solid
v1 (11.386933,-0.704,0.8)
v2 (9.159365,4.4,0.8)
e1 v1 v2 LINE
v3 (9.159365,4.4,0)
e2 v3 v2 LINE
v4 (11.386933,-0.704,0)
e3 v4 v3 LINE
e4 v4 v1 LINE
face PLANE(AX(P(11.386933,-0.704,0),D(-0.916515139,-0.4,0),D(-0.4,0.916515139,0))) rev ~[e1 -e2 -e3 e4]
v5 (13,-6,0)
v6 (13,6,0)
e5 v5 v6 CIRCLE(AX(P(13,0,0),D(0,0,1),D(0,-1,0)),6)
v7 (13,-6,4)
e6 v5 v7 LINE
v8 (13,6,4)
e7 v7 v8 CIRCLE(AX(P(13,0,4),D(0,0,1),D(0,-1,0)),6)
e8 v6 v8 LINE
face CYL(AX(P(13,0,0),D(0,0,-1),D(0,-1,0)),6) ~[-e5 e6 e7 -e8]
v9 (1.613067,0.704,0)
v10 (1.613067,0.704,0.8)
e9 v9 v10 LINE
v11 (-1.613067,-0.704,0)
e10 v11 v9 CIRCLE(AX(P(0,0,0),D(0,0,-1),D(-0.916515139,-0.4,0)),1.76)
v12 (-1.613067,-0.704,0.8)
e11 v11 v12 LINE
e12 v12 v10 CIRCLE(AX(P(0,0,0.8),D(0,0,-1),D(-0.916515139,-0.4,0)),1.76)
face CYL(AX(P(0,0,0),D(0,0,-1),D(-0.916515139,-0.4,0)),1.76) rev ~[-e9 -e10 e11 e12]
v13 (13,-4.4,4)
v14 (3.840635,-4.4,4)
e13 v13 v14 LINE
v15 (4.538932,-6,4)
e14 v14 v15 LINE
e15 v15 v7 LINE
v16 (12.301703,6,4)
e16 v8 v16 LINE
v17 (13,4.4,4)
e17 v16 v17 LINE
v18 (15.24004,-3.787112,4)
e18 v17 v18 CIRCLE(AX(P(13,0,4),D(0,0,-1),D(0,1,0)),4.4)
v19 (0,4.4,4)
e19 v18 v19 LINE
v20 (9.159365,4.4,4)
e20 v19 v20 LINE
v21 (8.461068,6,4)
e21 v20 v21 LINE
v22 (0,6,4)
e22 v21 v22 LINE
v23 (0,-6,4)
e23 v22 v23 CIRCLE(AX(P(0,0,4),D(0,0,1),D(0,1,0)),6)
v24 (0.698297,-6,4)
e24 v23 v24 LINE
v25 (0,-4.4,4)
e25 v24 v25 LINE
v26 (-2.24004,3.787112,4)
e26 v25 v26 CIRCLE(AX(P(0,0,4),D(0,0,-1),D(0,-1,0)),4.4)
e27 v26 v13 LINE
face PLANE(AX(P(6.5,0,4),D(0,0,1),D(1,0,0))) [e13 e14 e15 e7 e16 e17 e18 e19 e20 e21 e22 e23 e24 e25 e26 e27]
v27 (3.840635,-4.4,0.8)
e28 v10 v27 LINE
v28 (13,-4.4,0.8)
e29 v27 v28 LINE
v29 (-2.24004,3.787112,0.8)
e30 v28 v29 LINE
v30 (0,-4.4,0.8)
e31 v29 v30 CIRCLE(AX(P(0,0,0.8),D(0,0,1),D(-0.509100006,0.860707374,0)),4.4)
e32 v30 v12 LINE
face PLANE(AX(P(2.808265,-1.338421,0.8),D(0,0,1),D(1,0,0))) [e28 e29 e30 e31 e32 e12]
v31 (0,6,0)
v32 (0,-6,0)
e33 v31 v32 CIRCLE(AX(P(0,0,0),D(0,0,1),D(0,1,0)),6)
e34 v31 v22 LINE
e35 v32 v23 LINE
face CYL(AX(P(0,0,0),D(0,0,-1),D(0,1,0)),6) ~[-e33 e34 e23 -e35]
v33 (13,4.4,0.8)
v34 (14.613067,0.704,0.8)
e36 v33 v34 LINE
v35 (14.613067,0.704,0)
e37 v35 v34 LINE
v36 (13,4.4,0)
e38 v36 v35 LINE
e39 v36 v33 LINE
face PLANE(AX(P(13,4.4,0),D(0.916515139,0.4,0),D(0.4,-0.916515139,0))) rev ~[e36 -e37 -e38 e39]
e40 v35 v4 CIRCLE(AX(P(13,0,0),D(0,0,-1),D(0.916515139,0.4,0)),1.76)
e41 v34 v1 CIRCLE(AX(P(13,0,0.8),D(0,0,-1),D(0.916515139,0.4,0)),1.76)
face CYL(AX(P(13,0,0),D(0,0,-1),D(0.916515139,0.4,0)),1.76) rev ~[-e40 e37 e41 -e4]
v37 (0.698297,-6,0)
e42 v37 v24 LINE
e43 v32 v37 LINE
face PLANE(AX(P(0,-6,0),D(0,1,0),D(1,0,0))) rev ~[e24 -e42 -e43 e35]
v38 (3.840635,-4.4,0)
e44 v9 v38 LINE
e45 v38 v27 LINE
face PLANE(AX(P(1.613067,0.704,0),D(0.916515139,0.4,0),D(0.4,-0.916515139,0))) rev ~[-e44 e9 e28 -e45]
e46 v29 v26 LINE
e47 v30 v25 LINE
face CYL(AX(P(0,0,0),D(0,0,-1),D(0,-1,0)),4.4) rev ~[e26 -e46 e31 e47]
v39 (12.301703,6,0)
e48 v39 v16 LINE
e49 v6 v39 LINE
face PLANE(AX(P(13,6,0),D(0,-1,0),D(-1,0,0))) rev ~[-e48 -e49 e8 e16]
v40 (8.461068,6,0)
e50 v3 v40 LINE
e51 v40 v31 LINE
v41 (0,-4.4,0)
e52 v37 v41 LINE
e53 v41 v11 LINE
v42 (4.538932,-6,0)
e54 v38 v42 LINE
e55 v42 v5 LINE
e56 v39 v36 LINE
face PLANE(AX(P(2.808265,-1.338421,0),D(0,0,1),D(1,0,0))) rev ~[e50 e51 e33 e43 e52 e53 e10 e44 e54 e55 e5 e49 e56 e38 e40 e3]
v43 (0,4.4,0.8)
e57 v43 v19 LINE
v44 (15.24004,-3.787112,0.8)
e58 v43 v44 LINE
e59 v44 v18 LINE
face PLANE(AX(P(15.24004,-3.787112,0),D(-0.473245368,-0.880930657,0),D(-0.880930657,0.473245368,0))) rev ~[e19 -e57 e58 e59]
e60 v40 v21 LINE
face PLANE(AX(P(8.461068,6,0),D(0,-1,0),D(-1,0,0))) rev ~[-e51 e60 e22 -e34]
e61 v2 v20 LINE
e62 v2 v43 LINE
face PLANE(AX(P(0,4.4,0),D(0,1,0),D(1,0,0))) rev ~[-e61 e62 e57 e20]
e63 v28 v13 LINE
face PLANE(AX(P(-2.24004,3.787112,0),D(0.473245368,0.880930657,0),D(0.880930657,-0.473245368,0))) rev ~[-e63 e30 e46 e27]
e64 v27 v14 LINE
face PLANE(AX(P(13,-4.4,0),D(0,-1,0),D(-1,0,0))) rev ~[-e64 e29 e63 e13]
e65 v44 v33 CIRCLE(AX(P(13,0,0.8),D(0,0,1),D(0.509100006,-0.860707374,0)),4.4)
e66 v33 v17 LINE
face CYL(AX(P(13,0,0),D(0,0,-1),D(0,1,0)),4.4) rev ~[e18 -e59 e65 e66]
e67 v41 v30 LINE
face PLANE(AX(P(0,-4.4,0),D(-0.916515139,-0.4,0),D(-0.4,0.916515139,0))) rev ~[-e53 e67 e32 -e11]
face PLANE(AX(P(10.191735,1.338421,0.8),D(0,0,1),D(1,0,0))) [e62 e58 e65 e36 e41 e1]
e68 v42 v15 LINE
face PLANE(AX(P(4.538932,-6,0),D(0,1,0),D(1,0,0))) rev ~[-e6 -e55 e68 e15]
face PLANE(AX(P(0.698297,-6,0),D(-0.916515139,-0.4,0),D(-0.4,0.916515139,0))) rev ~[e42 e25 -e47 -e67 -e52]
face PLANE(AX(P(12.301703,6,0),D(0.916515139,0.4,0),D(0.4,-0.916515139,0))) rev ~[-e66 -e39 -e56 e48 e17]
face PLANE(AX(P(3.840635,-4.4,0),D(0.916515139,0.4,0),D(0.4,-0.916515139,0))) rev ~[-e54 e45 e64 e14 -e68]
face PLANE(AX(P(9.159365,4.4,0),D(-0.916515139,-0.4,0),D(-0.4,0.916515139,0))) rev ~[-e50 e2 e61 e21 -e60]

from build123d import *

# Parameters (mm, degrees)
F1_DEPTH = 4
F2_DEPTH = 0.8


# Not quite as in the source:
# - a feature names something its author has since deleted; it is built from what else it names


with BuildPart() as f1:
    # F0 (on Top) → F1 (new body)
    with BuildSketch(Plane.XY):
        with BuildLine():
            Line((8.4610678831, 6), (0, 6))
            ThreePointArc((0, 6), (-6, 0), (0, -6))
            Line((0, -6), (0.6982972488, -6))
            Line((0.6982972488, -6), (0, -4.4))
            ThreePointArc((0, -4.4), (-4.2440131224, -1.1611858666), (-2.2400400253, 3.7871124469))
            Line((-2.2400400253, 3.7871124469), (13, -4.4))
            Line((13, -4.4), (3.8406348682, -4.4))
            Line((3.8406348682, -4.4), (4.5389321169, -6))
            Line((4.5389321169, -6), (13, -6))
            ThreePointArc((13, -6), (19, 0), (13, 6))
            Line((13, 6), (12.3017027512, 6))
            Line((12.3017027512, 6), (13, 4.4))
            ThreePointArc((13, 4.4), (17.2440131224, 1.1611858666), (15.2400400253, -3.7871124469))
            Line((15.2400400253, -3.7871124469), (0, 4.4))
            Line((0, 4.4), (9.1593651318, 4.4))
            Line((9.1593651318, 4.4), (8.4610678831, 6))
        make_face()
    extrude(amount=F1_DEPTH)

    # F0 (on Top) → F2 (join)
    with BuildSketch(Plane.XY):
        with BuildLine():
            ThreePointArc((-2.2400400253, 3.7871124469), (-4.2440131224, -1.1611858666), (0, -4.4))
            Line((0, -4.4), (-0.8065333223, -2.552))
            Line((-0.8065333223, -2.552), (-1.6130666446, -0.704))
            ThreePointArc((-1.6130666446, -0.704), (-0.704, 1.6130666446), (1.6130666446, 0.704))
            Line((1.6130666446, 0.704), (3.8406348682, -4.4))
            Line((3.8406348682, -4.4), (13, -4.4))
            Line((13, -4.4), (-2.2400400253, 3.7871124469))
        make_face()
        with BuildLine():
            Line((11.3869333554, -0.704), (9.1593651318, 4.4))
            Line((9.1593651318, 4.4), (0, 4.4))
            Line((0, 4.4), (15.2400400253, -3.7871124469))
            ThreePointArc((15.2400400253, -3.7871124469), (17.2440131224, 1.1611858666), (13, 4.4))
            Line((13, 4.4), (14.6130666446, 0.704))
            ThreePointArc((14.6130666446, 0.704), (13.704, -1.6130666446), (11.3869333554, -0.704))
        make_face()
    extrude(amount=F2_DEPTH)


solid = f1.part
